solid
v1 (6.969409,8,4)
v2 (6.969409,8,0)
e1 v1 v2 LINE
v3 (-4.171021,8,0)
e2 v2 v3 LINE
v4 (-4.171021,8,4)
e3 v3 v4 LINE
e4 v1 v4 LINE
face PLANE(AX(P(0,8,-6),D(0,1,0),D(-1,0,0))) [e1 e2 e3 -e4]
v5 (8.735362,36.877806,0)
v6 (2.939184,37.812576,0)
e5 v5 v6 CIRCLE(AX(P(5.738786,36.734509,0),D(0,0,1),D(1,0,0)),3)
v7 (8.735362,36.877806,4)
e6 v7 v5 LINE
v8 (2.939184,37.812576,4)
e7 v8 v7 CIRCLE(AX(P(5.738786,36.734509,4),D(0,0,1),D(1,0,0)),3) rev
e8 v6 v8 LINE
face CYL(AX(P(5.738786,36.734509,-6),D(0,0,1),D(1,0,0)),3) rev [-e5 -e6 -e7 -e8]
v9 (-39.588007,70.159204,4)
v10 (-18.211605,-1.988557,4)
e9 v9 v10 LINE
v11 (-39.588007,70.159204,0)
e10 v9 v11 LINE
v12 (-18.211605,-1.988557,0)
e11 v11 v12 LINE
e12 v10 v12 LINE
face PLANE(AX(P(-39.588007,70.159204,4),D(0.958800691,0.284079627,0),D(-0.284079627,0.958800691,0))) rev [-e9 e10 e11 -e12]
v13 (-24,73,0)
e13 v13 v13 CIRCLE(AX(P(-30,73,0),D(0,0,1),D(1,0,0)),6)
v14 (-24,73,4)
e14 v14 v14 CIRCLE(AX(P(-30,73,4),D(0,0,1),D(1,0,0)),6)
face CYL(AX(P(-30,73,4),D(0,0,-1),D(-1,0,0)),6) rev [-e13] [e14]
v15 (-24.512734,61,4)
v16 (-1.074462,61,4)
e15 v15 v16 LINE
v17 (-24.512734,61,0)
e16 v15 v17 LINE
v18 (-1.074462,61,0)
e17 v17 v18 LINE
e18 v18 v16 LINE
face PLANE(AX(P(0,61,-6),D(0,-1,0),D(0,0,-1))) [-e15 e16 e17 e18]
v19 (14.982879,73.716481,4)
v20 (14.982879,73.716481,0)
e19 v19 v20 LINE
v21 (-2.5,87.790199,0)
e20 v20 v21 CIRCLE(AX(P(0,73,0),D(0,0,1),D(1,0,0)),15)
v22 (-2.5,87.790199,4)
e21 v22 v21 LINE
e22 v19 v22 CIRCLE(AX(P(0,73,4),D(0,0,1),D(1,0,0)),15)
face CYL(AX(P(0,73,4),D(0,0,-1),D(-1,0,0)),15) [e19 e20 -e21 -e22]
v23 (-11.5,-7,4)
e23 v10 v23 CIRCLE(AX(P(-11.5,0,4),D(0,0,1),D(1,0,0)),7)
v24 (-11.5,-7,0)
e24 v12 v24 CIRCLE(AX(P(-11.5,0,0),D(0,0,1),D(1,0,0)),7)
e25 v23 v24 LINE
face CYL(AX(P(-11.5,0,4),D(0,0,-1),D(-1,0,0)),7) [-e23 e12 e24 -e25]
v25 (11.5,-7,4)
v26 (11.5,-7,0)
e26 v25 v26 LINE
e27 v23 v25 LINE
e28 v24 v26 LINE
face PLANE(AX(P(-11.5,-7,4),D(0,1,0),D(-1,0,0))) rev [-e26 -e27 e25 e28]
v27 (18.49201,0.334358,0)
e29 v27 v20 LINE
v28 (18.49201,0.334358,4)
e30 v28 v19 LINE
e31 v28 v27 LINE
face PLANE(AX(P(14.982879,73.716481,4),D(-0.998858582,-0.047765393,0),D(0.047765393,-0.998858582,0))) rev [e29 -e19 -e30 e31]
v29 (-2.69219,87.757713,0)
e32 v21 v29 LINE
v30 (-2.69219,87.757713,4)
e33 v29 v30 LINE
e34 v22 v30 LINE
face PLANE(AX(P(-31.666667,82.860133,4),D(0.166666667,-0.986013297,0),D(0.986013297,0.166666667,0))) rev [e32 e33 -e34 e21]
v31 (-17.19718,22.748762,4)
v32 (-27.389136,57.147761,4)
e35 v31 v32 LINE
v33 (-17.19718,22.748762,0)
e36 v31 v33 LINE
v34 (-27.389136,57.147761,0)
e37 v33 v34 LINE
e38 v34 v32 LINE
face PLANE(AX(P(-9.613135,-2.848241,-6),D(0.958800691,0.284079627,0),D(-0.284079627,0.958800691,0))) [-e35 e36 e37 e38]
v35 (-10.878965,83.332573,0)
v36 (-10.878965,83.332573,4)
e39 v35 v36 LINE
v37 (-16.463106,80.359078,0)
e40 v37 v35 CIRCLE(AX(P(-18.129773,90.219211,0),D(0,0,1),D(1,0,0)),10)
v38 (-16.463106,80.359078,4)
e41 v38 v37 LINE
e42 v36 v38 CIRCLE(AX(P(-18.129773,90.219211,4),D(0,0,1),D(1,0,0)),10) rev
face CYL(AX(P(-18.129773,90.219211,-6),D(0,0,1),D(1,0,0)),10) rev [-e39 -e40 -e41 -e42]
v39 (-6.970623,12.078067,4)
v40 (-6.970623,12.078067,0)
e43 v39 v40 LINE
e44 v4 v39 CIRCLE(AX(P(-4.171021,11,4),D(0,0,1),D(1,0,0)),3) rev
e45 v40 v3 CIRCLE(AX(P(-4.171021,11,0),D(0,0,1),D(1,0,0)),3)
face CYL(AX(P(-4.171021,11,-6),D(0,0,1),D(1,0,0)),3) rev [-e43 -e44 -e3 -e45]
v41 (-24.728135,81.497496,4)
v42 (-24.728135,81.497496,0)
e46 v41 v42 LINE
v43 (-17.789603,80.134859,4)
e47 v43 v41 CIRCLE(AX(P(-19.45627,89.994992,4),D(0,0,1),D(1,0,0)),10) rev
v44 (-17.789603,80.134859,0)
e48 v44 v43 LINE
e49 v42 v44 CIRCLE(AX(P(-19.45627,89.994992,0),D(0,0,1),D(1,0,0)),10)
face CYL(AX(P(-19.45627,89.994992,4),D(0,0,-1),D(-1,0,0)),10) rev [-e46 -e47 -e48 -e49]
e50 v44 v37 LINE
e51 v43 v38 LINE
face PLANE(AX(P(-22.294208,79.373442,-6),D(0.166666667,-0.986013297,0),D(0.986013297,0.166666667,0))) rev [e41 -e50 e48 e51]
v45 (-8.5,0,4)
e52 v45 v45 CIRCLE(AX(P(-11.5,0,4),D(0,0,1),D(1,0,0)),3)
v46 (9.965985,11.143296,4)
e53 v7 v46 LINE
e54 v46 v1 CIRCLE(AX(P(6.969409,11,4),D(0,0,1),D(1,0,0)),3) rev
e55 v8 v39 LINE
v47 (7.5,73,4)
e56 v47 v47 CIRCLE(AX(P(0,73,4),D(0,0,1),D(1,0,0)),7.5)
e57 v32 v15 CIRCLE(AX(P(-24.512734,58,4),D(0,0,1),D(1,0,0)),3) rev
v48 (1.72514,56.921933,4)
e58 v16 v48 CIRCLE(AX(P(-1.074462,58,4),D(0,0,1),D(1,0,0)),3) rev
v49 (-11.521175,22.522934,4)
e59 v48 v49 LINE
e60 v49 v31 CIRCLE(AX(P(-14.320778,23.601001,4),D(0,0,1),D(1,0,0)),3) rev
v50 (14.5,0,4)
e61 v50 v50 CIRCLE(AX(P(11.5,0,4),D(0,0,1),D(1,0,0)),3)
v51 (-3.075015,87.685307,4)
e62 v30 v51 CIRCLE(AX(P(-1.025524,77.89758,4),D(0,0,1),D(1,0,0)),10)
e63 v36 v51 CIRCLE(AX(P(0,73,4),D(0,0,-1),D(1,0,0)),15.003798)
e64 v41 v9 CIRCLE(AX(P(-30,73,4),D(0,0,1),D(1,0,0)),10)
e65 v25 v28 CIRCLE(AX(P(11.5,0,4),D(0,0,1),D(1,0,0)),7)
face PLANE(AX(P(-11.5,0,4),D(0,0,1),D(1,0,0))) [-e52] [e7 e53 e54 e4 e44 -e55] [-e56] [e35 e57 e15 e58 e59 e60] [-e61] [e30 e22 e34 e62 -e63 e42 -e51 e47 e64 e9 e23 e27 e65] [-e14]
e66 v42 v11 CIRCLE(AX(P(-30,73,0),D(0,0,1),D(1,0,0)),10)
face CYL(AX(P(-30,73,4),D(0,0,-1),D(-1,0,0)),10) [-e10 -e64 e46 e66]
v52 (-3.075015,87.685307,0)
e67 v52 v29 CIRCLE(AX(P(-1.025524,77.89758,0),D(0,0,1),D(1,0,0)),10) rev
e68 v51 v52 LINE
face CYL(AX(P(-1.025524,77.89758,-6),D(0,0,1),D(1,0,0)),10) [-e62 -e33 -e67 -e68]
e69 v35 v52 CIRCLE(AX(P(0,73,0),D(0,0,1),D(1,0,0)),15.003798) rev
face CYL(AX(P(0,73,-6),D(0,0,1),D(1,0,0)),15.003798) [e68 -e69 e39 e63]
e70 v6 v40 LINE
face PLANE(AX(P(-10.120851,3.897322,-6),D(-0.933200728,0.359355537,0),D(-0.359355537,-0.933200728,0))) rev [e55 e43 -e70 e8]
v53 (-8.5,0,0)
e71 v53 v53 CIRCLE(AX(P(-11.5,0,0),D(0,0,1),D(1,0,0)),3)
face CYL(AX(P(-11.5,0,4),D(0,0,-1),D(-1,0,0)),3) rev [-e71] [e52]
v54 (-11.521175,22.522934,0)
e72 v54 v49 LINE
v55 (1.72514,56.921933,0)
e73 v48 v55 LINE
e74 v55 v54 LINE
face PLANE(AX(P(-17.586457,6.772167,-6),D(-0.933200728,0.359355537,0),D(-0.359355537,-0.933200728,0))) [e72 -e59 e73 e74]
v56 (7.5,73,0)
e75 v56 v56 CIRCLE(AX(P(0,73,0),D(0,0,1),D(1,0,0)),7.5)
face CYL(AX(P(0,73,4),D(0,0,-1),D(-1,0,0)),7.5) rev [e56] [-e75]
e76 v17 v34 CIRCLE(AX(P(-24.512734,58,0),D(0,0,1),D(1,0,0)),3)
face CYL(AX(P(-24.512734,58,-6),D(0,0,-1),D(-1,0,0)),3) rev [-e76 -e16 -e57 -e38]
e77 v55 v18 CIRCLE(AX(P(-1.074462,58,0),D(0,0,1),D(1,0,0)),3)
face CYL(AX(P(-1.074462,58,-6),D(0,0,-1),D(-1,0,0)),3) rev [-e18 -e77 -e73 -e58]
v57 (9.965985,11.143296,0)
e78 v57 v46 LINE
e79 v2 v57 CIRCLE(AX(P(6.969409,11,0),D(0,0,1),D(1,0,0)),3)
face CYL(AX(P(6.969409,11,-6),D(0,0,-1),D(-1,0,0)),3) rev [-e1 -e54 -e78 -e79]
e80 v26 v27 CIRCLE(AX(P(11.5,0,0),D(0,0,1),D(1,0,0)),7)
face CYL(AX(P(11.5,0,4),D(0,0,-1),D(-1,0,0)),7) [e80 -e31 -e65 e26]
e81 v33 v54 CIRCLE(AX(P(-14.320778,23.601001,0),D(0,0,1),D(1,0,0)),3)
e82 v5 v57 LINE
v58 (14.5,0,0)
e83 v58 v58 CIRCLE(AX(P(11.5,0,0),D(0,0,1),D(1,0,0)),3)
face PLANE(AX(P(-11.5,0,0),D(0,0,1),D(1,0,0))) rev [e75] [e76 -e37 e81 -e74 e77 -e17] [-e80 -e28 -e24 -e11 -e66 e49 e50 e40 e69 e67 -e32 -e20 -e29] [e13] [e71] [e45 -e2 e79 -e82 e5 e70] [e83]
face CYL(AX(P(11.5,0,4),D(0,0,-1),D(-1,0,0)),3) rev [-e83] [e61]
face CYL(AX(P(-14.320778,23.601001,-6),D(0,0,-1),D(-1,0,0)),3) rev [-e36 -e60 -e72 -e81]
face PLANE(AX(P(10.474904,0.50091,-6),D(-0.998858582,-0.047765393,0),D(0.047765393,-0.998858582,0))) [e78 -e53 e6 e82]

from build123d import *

# Parameters (mm, degrees)
SKETCH_1_R          = 3
SKETCH_1_R_2        = 7.5
SKETCH_1_R_3        = 6
EXTRUDE_1_DEPTH     = 4
CUT_EXTRUDE_START   = -10
CUT_EXTRUDE_2_DEPTH = 10
CUT_EXTRUDE_6_DEPTH = 10
FILLET_8_R          = 3
FILLET_9_R          = 10


with BuildPart() as part:
    # 草图1 → 凸台-拉伸1 (new body)
    with BuildSketch(Plane.XY):
        with BuildLine():
            Line((-39.588006912, 70.159203728), (-18.211604838, -1.988557391))
            ThreePointArc((-18.211604838, -1.988557391), (-15.688084184, -5.608917085), (-11.5, -7))
            Line((-11.5, -7), (11.5, -7))
            ThreePointArc((11.5, -7), (16.566581898, -4.83008777), (18.492010075, 0.334357752))
            Line((18.492010075, 0.334357752), (14.982878733, 73.716480896))
            ThreePointArc((14.982878733, 73.716480896), (9.406006267, 84.684478854), (-2.5, 87.790199458))
            Line((-2.5, 87.790199458), (-31.666666667, 82.860132972))
            ThreePointArc((-31.666666667, 82.860132972), (-38.485005613, 78.291944798), (-39.588006912, 70.159203728))
        make_face()
        with Locations((11.5, 0)):
            Circle(SKETCH_1_R, mode=Mode.SUBTRACT)
        with Locations((-11.5, 0)):
            Circle(SKETCH_1_R, mode=Mode.SUBTRACT)
        with Locations((0, 73)):
            Circle(SKETCH_1_R_2, mode=Mode.SUBTRACT)
        with Locations((-30, 73)):
            Circle(SKETCH_1_R_3, mode=Mode.SUBTRACT)
    extrude(amount=EXTRUDE_1_DEPTH)

    # 草图3 → 切除-拉伸2 (cut)
    with BuildSketch(Plane.XY.offset(4).offset(CUT_EXTRUDE_START)):
        with BuildLine():
            Line((-22.294207695, 79.373442159), (-12.695653982, 80.995893861))
            ThreePointArc((-12.695653982, 80.995893861), (-8.463678603, 85.388708293), (-2.832841434, 87.733938987))
            Line((-2.832841434, 87.733938987), (-31.666666667, 82.860132972))
            ThreePointArc((-31.666666667, 82.860132972), (-26.513309187, 82.372458972), (-22.294207695, 79.373442159))
        make_face()
    extrude(amount=CUT_EXTRUDE_2_DEPTH, mode=Mode.SUBTRACT)

    # 草图7 → 切除-拉伸6 (cut)
    with BuildSketch(Plane.XY.offset(4)):
        Polygon((3.295515487, 61), (-28.530502179, 61), (-14.691197263, 14.290789455), align=None)
        Polygon((10.116297473, 8), (8.055325934, 51.098548475), (-8.540998481, 8), align=None)
    extrude(amount=-CUT_EXTRUDE_6_DEPTH, mode=Mode.SUBTRACT)

    # 圆角8
    fillet_8_edges = [part.edges().sort_by_distance(p)[0] for p in [
        (8.055325934, 51.098548475, 2),
        (10.116297473, 8, 2),
        (-8.540998481, 8, 2),
        (3.295515487, 61, 2),
        (-14.691197263, 14.290789455, 2),
        (-28.530502179, 61, 2),
    ]]
    fillet(fillet_8_edges, radius=FILLET_8_R)

    # 圆角9
    # the kernel refuses this fillet: 10 mm, written as the material it adds along each edge
    with BuildSketch(Plane(origin=(-12.695653982, 80.995893861, 0), x_dir=(0.613787273879612, 0.789471457636965, 0), z_dir=(0, 0, 1))) as fillet_9_piece_1:
        with BuildLine():
            CenterArc((3.946152578, 9.951236707), FILLET_9_R, 227.457922435, 36.881499563)
            Line((-2.815162182, 2.583426808), (0, 0))
            ThreePointArc((0, 0), (1.479900866, 0.073163458), (2.959801732, 0))
        make_face()
    extrude(amount=4)
    with BuildSketch(Plane(origin=(-22.294207695, 79.373442159, 0), x_dir=(0.9860132971832692, 0.16666666666666718, 0), z_dir=(0, 0, 1))) as fillet_9_piece_2:
        with BuildLine():
            CenterArc((4.568502517, 10), FILLET_9_R, 228.590377891, 41.409622109)
            ThreePointArc((-2.04587576, 2.5), (-0.921320126, 1.33315892), (0, 0))
            Line((0, 0), (4.568502517, 0))
        make_face()
    extrude(amount=4)
    # the kernel refuses this fillet: 10 mm, written as the material it takes off along each edge
    with BuildSketch(Plane(origin=(-2.832841434, 87.733938987, -0.617519745), x_dir=(0.9860132971832704, 0.16666666666666025, 0), z_dir=(0, 0, 1))) as fillet_9_2_piece_1:
        with BuildLine():
            CenterArc((0.14264617, -10), FILLET_9_R, 90, 2.232449915)
            ThreePointArc((-0.246891263, -0.007589851), (-0.123461251, -0.003286845), (0, 0))
            Line((0, 0), (0.14264617, 0))
        make_face()
    extrude(amount=5.23503949, mode=Mode.SUBTRACT)


solid = part.part
